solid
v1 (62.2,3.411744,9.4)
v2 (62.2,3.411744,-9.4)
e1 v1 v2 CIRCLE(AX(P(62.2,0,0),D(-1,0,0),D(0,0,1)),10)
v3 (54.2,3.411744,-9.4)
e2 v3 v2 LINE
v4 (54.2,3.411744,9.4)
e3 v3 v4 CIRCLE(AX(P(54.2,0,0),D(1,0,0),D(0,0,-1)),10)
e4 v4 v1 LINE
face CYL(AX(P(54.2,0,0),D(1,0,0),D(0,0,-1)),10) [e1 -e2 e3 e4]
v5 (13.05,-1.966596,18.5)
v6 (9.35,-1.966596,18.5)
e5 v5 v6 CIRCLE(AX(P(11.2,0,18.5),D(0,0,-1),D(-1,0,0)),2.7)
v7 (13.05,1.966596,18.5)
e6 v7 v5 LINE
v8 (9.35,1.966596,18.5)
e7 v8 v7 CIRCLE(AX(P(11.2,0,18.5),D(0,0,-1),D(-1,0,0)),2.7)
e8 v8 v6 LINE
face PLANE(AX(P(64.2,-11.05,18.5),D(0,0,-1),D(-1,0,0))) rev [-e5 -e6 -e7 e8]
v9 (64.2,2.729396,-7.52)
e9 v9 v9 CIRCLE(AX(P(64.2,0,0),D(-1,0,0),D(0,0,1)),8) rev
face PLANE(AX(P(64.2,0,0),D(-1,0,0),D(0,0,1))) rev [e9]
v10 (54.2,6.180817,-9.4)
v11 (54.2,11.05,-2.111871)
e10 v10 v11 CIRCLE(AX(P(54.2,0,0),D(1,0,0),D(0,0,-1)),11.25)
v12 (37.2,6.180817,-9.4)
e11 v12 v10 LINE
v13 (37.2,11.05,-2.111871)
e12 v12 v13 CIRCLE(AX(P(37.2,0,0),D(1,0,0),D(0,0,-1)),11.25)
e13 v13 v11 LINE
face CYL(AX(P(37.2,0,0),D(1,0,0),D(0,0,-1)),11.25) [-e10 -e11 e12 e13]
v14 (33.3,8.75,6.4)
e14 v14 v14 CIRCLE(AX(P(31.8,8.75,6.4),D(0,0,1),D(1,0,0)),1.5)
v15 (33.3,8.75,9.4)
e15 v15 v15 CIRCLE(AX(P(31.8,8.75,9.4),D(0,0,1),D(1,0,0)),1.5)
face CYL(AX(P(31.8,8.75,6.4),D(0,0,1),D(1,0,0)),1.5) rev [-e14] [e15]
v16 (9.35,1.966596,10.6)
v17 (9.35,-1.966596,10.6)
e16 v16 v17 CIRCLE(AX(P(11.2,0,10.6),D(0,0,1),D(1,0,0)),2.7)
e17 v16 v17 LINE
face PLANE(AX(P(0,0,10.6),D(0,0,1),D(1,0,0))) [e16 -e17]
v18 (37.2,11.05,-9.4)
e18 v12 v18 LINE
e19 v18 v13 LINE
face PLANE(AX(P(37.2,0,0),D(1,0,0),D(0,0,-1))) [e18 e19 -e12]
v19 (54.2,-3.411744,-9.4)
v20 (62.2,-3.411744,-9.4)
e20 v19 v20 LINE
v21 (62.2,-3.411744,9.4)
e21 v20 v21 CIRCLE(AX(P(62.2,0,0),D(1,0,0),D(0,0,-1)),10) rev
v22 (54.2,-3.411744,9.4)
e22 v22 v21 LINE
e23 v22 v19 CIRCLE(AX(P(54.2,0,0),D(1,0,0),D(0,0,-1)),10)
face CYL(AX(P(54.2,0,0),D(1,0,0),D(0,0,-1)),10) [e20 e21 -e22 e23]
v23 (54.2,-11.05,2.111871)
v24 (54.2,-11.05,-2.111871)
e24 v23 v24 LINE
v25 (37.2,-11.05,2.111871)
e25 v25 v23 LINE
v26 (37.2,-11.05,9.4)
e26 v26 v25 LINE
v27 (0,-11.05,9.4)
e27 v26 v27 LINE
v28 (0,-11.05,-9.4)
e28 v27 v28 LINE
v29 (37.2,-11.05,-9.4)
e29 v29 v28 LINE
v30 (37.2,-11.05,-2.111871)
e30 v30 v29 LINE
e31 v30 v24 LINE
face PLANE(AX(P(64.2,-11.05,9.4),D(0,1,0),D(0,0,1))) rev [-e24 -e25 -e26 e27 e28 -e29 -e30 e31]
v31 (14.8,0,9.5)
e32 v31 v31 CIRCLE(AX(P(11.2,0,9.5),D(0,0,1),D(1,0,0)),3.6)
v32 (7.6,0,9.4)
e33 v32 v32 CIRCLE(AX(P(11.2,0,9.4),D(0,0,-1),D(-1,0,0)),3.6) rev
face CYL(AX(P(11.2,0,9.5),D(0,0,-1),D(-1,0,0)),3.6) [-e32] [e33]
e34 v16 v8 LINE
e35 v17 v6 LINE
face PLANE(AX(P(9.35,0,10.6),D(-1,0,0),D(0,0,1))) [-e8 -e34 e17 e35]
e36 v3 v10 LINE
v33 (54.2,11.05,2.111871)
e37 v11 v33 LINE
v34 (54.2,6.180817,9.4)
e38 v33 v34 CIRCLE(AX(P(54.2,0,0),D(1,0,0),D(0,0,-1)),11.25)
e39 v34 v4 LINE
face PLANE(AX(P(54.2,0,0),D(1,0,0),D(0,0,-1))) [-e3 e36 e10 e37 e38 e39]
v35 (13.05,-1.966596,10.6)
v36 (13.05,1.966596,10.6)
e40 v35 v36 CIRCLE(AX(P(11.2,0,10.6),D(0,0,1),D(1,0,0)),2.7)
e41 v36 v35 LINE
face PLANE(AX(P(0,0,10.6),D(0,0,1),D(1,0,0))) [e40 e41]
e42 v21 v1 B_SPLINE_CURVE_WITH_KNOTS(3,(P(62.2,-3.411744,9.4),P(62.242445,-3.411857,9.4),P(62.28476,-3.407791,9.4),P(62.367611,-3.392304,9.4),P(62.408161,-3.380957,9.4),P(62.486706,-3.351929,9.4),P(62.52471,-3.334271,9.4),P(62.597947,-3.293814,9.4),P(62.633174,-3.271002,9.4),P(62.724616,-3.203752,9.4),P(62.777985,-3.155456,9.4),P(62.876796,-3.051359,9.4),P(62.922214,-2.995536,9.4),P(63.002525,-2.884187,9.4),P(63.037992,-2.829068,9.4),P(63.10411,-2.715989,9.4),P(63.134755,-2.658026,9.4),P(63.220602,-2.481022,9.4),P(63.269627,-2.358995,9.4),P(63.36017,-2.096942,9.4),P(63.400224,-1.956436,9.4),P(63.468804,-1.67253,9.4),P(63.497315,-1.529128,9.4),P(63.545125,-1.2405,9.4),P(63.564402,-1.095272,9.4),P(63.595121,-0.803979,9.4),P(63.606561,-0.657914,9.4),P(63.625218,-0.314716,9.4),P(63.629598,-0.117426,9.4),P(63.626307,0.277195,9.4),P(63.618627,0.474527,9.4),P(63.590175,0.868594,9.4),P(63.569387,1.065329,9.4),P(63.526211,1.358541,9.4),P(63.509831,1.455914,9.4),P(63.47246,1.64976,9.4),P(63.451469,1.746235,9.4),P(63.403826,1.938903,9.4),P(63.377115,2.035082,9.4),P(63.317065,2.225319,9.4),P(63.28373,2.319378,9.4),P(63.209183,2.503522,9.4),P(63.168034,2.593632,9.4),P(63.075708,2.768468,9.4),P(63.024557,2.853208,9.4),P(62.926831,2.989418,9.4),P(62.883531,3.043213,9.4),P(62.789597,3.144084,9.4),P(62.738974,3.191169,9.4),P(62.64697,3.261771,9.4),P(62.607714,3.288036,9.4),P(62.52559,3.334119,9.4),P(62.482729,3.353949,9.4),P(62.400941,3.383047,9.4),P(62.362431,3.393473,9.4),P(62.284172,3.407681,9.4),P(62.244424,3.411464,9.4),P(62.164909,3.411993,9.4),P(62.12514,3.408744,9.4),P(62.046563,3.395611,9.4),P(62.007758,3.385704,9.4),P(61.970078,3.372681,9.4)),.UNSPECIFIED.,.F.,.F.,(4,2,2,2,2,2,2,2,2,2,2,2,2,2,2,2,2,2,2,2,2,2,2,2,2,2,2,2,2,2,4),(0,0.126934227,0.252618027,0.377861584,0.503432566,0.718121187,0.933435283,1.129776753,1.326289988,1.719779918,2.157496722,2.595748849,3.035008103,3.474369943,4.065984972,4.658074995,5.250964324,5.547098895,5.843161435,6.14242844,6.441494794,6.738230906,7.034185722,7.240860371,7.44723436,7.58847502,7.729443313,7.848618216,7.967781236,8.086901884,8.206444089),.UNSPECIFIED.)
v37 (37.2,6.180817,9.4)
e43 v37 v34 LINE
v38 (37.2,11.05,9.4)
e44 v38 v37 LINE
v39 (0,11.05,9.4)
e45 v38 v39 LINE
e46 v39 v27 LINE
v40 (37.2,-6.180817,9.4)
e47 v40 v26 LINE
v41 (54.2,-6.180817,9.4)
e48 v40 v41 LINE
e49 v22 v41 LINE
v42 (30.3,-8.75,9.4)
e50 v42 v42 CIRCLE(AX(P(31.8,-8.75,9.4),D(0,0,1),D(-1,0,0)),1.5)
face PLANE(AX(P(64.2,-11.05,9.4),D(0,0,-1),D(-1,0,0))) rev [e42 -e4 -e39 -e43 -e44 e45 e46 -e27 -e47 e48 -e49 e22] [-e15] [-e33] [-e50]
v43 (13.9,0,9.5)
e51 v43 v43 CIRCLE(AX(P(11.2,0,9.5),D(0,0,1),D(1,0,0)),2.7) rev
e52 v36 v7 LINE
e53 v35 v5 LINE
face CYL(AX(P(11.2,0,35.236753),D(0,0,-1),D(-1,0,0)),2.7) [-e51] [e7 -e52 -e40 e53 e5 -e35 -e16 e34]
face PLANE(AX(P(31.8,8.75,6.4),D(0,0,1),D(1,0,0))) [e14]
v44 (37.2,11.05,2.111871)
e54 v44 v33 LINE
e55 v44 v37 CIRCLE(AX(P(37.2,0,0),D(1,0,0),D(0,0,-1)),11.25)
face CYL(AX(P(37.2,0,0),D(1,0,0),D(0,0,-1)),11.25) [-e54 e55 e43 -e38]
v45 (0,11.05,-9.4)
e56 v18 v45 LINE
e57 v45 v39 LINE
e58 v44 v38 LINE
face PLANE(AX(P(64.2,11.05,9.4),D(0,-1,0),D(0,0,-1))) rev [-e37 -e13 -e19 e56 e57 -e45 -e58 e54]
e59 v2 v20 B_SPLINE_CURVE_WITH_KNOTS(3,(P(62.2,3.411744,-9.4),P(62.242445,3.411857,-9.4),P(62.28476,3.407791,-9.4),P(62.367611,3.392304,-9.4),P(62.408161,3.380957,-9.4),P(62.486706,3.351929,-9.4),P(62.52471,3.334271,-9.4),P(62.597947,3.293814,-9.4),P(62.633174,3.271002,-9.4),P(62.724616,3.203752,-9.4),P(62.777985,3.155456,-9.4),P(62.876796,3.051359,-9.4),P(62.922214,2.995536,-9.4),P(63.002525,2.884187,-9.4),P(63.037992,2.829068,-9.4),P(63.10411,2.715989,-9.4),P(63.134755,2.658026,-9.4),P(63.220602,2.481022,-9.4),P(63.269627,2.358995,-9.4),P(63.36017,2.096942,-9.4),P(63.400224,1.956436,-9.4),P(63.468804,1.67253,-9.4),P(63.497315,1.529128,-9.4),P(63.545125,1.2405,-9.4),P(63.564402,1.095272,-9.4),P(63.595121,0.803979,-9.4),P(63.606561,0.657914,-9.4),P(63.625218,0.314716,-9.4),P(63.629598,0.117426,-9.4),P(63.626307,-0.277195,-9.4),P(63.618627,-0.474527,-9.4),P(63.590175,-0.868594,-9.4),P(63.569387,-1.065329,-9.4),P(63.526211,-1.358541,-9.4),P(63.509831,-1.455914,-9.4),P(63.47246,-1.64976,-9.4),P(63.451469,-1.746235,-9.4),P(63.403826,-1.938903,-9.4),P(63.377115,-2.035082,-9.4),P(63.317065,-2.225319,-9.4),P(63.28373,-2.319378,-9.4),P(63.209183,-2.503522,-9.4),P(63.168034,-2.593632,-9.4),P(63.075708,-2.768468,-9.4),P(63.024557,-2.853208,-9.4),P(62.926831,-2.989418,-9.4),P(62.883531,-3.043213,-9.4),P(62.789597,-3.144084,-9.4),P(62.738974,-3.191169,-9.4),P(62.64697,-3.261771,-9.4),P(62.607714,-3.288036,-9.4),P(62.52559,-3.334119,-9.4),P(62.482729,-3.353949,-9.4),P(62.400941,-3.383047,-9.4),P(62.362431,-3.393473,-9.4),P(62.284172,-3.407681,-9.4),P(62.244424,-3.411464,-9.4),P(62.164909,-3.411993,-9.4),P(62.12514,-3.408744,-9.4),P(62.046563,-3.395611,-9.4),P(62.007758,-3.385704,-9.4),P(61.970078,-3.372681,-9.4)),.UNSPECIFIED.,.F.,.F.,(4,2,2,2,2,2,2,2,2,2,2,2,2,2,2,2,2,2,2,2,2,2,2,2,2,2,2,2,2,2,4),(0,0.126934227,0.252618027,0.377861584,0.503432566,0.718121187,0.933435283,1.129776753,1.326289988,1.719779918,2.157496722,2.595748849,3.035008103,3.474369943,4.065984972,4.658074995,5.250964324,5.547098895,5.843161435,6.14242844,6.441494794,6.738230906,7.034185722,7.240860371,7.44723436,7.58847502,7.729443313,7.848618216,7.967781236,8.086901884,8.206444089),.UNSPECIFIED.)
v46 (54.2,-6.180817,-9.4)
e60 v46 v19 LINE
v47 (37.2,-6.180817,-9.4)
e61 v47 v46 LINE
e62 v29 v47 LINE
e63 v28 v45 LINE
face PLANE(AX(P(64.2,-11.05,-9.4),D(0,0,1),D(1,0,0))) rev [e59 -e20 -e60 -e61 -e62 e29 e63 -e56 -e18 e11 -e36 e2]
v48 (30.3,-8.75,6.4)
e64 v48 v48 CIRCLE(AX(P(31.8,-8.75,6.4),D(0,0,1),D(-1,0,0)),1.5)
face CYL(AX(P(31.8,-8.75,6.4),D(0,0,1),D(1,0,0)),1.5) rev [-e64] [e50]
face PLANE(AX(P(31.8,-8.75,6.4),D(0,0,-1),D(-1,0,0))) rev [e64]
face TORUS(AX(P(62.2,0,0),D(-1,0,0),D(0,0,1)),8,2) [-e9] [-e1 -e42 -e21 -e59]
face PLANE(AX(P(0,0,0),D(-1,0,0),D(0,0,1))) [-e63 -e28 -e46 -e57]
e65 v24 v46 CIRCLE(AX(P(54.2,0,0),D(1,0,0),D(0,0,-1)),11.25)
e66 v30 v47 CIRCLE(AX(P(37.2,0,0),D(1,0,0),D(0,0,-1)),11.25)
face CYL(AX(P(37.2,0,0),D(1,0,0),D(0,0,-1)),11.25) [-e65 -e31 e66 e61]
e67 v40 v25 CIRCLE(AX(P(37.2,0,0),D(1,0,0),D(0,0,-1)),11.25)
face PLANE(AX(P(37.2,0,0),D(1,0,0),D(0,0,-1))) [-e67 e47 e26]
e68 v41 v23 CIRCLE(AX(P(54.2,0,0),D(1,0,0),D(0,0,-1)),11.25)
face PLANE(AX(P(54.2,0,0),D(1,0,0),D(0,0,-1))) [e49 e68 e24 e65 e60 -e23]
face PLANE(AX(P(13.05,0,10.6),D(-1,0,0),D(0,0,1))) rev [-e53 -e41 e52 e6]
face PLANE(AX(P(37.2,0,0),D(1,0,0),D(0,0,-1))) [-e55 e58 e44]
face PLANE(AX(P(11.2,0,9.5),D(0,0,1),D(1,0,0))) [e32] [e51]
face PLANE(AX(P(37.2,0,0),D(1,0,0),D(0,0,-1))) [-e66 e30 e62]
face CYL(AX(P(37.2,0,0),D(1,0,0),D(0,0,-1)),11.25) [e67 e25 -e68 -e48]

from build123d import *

# Parameters (mm, degrees)
SKETCH_2_W          = 18.8
SKETCH_2_H          = 22.1
EXTRUDE_1_DEPTH     = 64.2
SKETCH_4_R          = 3.6
EXTRUDE_2_DEPTH     = 0.1
SKETCH_5_R          = 2.7
EXTRUDE_3_DEPTH     = 9.1
CUT_EXTRUDE_START   = -7.9
CUT_EXTRUDE_1_DEPTH = 7.9
CUT_EXTRUDE_2_DEPTH = 27
CUT_EXTRUDE_3_DEPTH = 10
FILLET_1_R          = 2
SKETCH_10_R         = 1.5
CUT_EXTRUDE_4_DEPTH = 3


with BuildPart() as part:
    # 草图2 → 凸台-拉伸1 (new body)
    with BuildSketch(Plane(origin=(0, 0, 0), x_dir=(0, 0, -1), z_dir=(1, 0, 0))):
        Rectangle(SKETCH_2_W, SKETCH_2_H)
    extrude(amount=EXTRUDE_1_DEPTH)

    # 草图4 → 凸台-拉伸2 (add)
    with BuildSketch(Plane.XY.offset(9.4)):
        with Locations(Location((11.2, 0, 0), (0, 0, 180))):
            Circle(SKETCH_4_R)
    extrude(amount=EXTRUDE_2_DEPTH)

    # 草图5 → 凸台-拉伸3 (add)
    with BuildSketch(Plane.XY.offset(9.4)):
        with Locations(Location((11.2, 0, 0), (0, 0, 180))):
            Circle(SKETCH_5_R)
    extrude(amount=EXTRUDE_3_DEPTH)

    # 草图6 → 切除-拉伸1 (cut)
    with BuildSketch(Plane.XY.offset(18.5).offset(CUT_EXTRUDE_START)):
        with BuildLine():
            Line((9.35, -1.966596044), (9.35, 1.966596044))
            ThreePointArc((9.35, 1.966596044), (8.5, 0), (9.35, -1.966596044))
        make_face()
        with BuildLine():
            ThreePointArc((13.9, 0), (13.678406746, 1.071214264), (13.05, 1.966596044))
            Line((13.05, 1.966596044), (13.05, -1.966596044))
            ThreePointArc((13.05, -1.966596044), (13.678406746, -1.071214264), (13.9, 0))
        make_face()
    extrude(amount=CUT_EXTRUDE_1_DEPTH, mode=Mode.SUBTRACT)

    # 草图7 → 切除-拉伸2 (cut)
    with BuildSketch(Plane(origin=(64.2, 0, 0), x_dir=(0, 0, -1), z_dir=(1, 0, 0))):
        with BuildLine():
            ThreePointArc((-9.4, 6.180817098), (-6.249642407, 9.354382384), (-2.111871208, 11.05))
            Line((-2.111871208, 11.05), (-9.4, 11.05))
            Line((-9.4, 11.05), (-9.4, 6.180817098))
        make_face()
        with BuildLine():
            ThreePointArc((2.111871208, 11.05), (6.249642407, 9.354382384), (9.4, 6.180817098))
            Line((9.4, 6.180817098), (9.4, 11.05))
            Line((9.4, 11.05), (2.111871208, 11.05))
        make_face()
        with BuildLine():
            Line((2.111871208, -11.05), (9.4, -11.05))
            Line((9.4, -11.05), (9.4, -6.180817098))
            ThreePointArc((9.4, -6.180817098), (6.249642407, -9.354382384), (2.111871208, -11.05))
        make_face()
        with BuildLine():
            Line((-9.4, -11.05), (-2.111871208, -11.05))
            ThreePointArc((-2.111871208, -11.05), (-6.249642407, -9.354382384), (-9.4, -6.180817098))
            Line((-9.4, -6.180817098), (-9.4, -11.05))
        make_face()
    extrude(amount=-CUT_EXTRUDE_2_DEPTH, mode=Mode.SUBTRACT)

    # 草图9 → 切除-拉伸3 (cut)
    with BuildSketch(Plane(origin=(64.2, 0, 0), x_dir=(0, 0, -1), z_dir=(1, 0, 0))):
        with BuildLine():
            Line((-9.4, 6.180817098), (-9.4, 3.411744422))
            ThreePointArc((-9.4, 3.411744422), (0, 10), (9.4, 3.411744422))
            Line((9.4, 3.411744422), (9.4, 6.180817098))
            ThreePointArc((9.4, 6.180817098), (6.249642407, 9.354382384), (2.111871208, 11.05))
            Line((2.111871208, 11.05), (-2.111871208, 11.05))
            ThreePointArc((-2.111871208, 11.05), (-6.249642407, 9.354382384), (-9.4, 6.180817098))
        make_face()
        with BuildLine():
            ThreePointArc((-9.4, -6.180817098), (-6.249642407, -9.354382384), (-2.111871208, -11.05))
            Line((-2.111871208, -11.05), (2.111871208, -11.05))
            ThreePointArc((2.111871208, -11.05), (6.249642407, -9.354382384), (9.4, -6.180817098))
            Line((9.4, -6.180817098), (9.4, -3.411744422))
            ThreePointArc((9.4, -3.411744422), (0, -10), (-9.4, -3.411744422))
            Line((-9.4, -3.411744422), (-9.4, -6.180817098))
        make_face()
    extrude(amount=-CUT_EXTRUDE_3_DEPTH, mode=Mode.SUBTRACT)

    # 圆角1
    # the kernel refuses this fillet: 2 mm, written as the material it takes off along each edge
    with BuildSketch(Plane(origin=(64.2, 0, 0), x_dir=(0, -0.15173257370011314, 0.9884215831710372), z_dir=(0, -0.9884215831710372, -0.15173257370011314))) as fillet_1_piece_1:
        with BuildLine():
            CenterArc((10 - FILLET_1_R, FILLET_1_R), FILLET_1_R, 270, 90)
            Line((10 - FILLET_1_R, 0), (10, 0))
            Line((10, 0), (10, FILLET_1_R))
        make_face()
    revolve(axis=Axis((64.2, 0, 0), (-1, 0, 0)), revolution_arc=197.454690212, mode=Mode.SUBTRACT)
    with BuildSketch(Plane(origin=(64.2, 0, 0), x_dir=(0, 0.1517325737001477, -0.9884215831710319), z_dir=(0, 0.9884215831710319, 0.1517325737001477))) as fillet_1_piece_2:
        with BuildLine():
            CenterArc((10 - FILLET_1_R, FILLET_1_R), FILLET_1_R, 270, 90)
            Line((10, FILLET_1_R), (10, 0))
            Line((10, 0), (10 - FILLET_1_R, 0))
        make_face()
    revolve(axis=Axis((64.2, 0, 0), (-1, 0, 0)), revolution_arc=197.454690212, mode=Mode.SUBTRACT)

    # 草图10 → 切除-拉伸4 (cut)
    with BuildSketch(Plane.XY.offset(9.4)):
        with Locations((31.8, 8.75)):
            Circle(SKETCH_10_R)
        with Locations(Location((31.8, -8.75, 0), (0, 0, 180))):
            Circle(SKETCH_10_R)
    extrude(amount=-CUT_EXTRUDE_4_DEPTH, mode=Mode.SUBTRACT)


solid = part.part
